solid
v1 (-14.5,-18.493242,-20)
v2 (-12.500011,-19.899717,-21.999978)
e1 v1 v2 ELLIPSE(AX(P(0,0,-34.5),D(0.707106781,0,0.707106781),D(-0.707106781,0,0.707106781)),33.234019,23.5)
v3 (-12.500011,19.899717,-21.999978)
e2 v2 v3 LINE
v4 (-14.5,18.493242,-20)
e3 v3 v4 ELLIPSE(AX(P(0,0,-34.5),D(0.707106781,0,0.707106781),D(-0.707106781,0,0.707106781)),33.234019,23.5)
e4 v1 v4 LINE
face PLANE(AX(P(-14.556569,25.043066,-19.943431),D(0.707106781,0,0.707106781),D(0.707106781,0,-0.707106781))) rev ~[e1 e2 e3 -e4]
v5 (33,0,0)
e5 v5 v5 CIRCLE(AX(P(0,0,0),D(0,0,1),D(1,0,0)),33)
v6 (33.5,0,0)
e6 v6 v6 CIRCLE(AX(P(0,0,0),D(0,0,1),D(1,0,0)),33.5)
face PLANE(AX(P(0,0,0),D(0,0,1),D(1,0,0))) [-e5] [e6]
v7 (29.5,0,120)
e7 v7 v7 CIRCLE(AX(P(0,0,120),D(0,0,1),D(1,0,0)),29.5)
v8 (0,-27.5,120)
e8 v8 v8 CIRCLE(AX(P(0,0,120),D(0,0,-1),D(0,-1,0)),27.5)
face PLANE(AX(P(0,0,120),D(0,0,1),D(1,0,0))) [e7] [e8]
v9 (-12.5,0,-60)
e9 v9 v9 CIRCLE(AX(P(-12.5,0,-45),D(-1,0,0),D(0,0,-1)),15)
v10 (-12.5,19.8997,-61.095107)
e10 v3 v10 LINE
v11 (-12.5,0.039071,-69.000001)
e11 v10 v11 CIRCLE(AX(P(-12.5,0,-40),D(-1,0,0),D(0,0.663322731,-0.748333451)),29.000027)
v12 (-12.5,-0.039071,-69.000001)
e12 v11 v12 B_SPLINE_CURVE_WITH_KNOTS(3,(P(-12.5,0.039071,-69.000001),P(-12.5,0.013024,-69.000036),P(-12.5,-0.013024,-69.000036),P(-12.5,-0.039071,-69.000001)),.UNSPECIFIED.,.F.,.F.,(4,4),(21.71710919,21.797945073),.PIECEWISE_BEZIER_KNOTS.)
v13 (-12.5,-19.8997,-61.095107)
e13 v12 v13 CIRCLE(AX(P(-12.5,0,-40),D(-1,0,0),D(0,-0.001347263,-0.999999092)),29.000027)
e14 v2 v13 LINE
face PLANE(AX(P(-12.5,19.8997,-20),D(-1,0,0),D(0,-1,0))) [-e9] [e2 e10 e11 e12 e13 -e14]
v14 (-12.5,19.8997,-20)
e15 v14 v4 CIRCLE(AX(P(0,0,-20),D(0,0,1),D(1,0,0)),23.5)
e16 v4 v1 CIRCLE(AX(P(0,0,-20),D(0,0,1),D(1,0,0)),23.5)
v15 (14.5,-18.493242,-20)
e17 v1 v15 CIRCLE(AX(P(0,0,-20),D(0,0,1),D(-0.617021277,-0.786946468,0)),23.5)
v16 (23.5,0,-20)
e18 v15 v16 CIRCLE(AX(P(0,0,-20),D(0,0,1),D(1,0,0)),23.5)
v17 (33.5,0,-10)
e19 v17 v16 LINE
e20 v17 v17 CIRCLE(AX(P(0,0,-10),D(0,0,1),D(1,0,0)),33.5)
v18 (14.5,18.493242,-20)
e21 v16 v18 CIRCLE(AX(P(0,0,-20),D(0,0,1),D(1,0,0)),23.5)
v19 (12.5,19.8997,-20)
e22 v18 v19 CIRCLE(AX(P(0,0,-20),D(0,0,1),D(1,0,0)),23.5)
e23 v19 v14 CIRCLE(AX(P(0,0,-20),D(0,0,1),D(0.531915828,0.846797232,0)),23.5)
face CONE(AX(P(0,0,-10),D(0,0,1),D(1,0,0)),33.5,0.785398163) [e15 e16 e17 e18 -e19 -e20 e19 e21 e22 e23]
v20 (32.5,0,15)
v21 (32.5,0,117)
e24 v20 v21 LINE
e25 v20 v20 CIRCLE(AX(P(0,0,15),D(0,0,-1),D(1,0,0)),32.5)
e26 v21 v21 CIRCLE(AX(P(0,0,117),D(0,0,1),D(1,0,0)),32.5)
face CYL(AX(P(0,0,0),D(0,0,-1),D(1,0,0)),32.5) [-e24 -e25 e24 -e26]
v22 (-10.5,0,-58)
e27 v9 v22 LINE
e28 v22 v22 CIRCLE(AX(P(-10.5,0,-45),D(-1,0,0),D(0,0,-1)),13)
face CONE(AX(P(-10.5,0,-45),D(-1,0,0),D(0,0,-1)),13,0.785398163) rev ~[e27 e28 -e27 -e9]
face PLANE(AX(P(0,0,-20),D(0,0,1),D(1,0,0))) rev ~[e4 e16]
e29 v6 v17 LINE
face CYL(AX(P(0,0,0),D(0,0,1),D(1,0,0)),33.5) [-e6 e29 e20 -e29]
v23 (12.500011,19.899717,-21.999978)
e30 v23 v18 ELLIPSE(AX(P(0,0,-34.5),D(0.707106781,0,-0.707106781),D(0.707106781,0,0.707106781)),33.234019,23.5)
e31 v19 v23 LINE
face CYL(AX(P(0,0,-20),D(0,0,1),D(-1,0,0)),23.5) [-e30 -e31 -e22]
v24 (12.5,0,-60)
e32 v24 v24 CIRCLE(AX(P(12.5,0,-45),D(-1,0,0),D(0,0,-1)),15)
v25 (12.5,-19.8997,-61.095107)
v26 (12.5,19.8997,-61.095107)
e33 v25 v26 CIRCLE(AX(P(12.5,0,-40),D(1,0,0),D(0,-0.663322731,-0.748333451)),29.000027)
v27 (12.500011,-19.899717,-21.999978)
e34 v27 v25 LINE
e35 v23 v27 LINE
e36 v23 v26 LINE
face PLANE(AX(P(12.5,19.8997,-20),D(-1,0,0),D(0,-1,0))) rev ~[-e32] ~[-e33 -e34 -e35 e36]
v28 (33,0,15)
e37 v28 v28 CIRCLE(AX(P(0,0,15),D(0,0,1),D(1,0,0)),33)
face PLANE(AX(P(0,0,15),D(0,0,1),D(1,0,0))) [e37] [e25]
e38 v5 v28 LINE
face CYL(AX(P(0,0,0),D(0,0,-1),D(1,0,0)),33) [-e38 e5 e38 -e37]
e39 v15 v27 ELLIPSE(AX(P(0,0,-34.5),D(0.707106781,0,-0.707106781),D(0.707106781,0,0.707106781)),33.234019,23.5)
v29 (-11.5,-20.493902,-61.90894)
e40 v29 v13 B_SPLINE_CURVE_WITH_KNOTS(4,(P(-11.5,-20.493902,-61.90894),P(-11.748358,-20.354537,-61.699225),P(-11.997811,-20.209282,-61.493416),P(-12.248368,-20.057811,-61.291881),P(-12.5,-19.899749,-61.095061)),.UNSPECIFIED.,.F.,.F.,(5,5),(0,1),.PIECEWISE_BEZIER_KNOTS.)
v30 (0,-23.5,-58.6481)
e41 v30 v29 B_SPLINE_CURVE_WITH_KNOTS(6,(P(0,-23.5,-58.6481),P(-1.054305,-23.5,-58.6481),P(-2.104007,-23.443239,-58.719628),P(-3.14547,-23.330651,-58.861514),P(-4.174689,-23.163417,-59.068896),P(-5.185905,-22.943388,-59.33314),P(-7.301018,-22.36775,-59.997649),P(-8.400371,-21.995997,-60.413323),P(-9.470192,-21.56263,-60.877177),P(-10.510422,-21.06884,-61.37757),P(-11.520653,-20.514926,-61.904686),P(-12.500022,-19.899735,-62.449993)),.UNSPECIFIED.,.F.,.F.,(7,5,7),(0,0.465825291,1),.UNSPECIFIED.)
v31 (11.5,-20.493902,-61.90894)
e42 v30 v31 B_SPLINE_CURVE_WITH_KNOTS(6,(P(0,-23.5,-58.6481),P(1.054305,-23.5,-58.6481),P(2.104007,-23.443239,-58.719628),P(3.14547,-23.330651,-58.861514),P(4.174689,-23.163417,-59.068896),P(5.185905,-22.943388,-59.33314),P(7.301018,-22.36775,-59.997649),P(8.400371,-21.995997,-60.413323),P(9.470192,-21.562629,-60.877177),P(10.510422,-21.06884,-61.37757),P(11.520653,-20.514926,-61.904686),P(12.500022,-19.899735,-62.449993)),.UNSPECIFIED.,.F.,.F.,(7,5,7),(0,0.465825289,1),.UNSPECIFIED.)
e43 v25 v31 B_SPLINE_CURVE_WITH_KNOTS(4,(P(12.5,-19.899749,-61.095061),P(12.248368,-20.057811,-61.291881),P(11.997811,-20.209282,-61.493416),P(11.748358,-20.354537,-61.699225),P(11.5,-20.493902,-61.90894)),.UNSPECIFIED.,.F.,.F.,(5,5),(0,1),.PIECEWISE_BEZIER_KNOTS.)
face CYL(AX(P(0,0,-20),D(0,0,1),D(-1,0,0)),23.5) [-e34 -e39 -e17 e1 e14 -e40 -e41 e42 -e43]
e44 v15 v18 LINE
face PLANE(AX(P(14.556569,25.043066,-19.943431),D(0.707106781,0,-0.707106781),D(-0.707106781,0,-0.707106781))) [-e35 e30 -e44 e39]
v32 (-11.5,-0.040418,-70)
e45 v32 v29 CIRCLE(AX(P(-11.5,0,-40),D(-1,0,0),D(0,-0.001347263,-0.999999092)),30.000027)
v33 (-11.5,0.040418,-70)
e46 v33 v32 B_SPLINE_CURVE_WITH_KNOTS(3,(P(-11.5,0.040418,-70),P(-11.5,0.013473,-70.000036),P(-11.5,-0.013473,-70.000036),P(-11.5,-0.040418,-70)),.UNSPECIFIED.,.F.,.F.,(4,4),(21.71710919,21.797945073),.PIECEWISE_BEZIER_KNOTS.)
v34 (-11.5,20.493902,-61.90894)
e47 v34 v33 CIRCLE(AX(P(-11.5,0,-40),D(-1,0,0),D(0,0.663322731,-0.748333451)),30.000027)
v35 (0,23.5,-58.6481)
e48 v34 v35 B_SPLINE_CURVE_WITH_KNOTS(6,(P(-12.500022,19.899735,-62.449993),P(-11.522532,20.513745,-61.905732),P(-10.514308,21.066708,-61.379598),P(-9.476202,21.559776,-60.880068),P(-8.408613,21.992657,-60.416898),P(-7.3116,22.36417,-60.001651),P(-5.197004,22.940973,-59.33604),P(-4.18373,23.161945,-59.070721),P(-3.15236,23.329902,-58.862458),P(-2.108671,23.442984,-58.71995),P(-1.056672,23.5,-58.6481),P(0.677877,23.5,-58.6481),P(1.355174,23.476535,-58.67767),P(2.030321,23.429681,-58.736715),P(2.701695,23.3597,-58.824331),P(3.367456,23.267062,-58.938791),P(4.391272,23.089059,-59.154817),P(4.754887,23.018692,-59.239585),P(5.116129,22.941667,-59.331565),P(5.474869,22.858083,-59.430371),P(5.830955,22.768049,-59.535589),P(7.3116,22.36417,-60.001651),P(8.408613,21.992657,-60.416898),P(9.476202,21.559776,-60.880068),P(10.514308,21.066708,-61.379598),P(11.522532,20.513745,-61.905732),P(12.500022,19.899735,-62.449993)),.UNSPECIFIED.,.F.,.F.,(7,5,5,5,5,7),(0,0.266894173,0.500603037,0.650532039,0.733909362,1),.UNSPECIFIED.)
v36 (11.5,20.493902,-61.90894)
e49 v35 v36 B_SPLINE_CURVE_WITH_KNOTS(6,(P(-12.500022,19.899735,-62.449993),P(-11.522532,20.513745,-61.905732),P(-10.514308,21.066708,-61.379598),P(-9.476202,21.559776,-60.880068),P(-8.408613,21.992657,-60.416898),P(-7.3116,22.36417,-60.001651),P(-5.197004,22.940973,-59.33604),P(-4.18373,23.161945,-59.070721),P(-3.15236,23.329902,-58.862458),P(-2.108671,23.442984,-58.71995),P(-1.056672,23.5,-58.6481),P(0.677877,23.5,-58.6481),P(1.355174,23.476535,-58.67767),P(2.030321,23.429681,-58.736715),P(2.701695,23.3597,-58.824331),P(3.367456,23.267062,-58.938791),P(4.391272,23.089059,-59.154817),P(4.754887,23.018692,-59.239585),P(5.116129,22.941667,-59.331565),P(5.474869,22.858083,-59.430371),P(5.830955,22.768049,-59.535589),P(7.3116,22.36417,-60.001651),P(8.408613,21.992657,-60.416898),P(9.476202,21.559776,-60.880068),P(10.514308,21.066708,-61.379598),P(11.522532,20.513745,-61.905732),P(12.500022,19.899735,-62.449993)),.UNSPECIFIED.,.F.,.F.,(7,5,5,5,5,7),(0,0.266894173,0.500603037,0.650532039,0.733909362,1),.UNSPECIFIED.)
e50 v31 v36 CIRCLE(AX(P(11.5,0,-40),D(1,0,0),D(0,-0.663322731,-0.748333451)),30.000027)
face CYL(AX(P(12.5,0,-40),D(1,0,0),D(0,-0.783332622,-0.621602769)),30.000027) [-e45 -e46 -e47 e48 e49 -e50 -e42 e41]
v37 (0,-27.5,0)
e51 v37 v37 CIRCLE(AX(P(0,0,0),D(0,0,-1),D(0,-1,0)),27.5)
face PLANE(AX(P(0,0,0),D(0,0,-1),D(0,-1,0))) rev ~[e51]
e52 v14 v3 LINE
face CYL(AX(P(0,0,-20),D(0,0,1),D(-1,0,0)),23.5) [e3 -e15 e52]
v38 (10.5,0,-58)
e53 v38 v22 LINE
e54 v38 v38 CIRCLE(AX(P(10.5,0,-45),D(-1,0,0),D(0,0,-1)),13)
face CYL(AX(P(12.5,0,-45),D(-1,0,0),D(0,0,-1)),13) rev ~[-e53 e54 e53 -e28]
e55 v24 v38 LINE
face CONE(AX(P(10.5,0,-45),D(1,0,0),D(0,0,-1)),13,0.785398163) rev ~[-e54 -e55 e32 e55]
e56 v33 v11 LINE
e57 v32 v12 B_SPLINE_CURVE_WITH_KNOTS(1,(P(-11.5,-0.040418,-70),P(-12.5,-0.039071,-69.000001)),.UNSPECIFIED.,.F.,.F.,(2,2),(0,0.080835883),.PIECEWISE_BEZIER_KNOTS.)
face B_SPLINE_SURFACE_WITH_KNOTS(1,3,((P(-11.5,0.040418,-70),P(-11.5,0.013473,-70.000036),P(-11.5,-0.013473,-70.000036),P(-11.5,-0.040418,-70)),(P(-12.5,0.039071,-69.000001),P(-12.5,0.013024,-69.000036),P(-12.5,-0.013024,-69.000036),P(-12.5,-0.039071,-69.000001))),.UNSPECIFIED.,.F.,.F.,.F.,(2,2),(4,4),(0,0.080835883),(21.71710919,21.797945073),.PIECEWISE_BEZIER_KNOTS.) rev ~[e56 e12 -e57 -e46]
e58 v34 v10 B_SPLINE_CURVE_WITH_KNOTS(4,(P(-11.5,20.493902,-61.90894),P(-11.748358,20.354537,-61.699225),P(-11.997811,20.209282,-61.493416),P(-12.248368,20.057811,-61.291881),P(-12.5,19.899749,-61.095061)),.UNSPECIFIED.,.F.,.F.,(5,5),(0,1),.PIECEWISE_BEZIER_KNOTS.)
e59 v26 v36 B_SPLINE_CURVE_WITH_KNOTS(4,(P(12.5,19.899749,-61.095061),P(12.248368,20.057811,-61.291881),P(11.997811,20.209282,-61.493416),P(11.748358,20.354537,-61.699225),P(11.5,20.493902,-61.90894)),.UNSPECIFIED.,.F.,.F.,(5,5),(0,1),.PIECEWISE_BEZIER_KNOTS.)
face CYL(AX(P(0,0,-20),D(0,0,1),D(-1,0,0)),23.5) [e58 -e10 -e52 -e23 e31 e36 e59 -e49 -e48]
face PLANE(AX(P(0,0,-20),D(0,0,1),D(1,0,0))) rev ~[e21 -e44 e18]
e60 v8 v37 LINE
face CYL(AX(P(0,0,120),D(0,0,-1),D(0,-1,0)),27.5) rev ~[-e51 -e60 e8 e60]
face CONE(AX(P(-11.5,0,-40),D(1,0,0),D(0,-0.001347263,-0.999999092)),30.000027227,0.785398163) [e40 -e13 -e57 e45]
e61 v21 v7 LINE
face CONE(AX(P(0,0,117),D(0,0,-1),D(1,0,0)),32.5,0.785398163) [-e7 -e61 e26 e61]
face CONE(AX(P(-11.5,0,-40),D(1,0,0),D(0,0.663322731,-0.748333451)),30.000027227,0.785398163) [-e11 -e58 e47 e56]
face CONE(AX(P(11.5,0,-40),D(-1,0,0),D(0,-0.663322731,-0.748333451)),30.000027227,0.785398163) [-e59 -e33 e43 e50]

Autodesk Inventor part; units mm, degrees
ref_plane "YZ Plane" through (0, 0, 0) normal (1, 0, 0) x (0, 1, 0)
ref_plane "XZ Plane" through (0, 0, 0) normal (0, 1, 0) x (-1, 0, 0)
ref_plane "XY Plane" through (0, 0, 0) normal (0, 0, 1) x (1, 0, 0)
sketch "Sketch1" plane through (0, 0, 0) normal (0, 0, 1) x (1, 0, 0)
  circle A0 centre (0, 0) radius 33.5
  circle A1 centre (0, 0) radius 33
  circle A2 centre (0, 0) radius 32.5
  dimension "d0" = 67
  dimension "d1" = 66
  dimension "d6" = 65
extrude "Extrusion1" add sketch "Sketch1" against normal blind 20 contours A0 | A1 | A2
extrude "Extrusion2" add sketch "Sketch1" along normal blind 15 contours A1 | A2
extrude "Extrusion3" add sketch "Sketch1" along normal blind 120 contours A2
chamfer "Chamfer1" distance 10 angle 45 1 edges at (-33.5, 0, -20)
chamfer "Chamfer2" [suppressed]
sketch "Sketch2" plane through (0, 0, -20) normal (0, 0, -1) x (-1, 0, 0)
  circle A0 centre (0, 0) radius 23.5 projected
  line L0 (-12.5, 19.8997) -> (-12.5, -19.8997)
  line L1 (12.5, 19.8997) -> (12.5, -19.8997)
  dimension "d15" = 25
extrude "Extrusion4" add sketch "Sketch2" along normal blind 50 contours L1 A0 L0
sketch "Sketch3" plane through (12.5, -19.8997, -20) normal (1, 0, 0) x (0, 0, -1)
  line L0 (50, 39.7995) -> (50, 43.3997) construction
  line L1 (50, -3.6003) -> (50, 0) construction
  arc A0 (38.6481, -3.6003) -> (38.6481, 43.3997) centre (20, 19.8997) ccw
  line L2 (38.6481, 43.3997) -> (38.6481, -3.6003) construction
  line L3 (38.6481, 43.3997) -> (85.6481, 43.3997) construction
  line L4 (38.6481, 43.3997) -> (55.8157, 43.3997)
  line L5 (38.6481, -3.6003) -> (55.8157, -3.6003)
  line L6 (50, 39.7995) -> (50, 0) construction
  line L7 (55.8157, -3.6003) -> (55.8157, 43.3997)
  point P0 (-20, 19.8997)
  point P1 (62.1481, 43.3997)
  dimension "d19" = 90
  dimension "d48" = 30
extrude "Extrusion5" cut sketch "Sketch3" against normal through all
hole "Hole1" at (12.5, 0, -45) direction (-1, 0, 0) diameter 26 end through all
chamfer "Chamfer3" distance 2 angle 45 2 edges at (12.5, 0, -20) (-12.5, 0, -20)
hole "Hole2" at (0, 0, 120) direction (0, 0, -1) diameter 55 depth 120
chamfer "Chamfer4" distance 3 angle 45 1 edges at (-32.5, 0, 120)
chamfer "Chamfer5" distance 1 angle 45 2 edges at (-12.5, 0, -70) (12.5, 0, -70)
chamfer "Chamfer6" distance 2 angle 45 2 edges at (12.5, 0, -32) (-12.5, 0, -32)
properties part number "Base" material "Steel"
